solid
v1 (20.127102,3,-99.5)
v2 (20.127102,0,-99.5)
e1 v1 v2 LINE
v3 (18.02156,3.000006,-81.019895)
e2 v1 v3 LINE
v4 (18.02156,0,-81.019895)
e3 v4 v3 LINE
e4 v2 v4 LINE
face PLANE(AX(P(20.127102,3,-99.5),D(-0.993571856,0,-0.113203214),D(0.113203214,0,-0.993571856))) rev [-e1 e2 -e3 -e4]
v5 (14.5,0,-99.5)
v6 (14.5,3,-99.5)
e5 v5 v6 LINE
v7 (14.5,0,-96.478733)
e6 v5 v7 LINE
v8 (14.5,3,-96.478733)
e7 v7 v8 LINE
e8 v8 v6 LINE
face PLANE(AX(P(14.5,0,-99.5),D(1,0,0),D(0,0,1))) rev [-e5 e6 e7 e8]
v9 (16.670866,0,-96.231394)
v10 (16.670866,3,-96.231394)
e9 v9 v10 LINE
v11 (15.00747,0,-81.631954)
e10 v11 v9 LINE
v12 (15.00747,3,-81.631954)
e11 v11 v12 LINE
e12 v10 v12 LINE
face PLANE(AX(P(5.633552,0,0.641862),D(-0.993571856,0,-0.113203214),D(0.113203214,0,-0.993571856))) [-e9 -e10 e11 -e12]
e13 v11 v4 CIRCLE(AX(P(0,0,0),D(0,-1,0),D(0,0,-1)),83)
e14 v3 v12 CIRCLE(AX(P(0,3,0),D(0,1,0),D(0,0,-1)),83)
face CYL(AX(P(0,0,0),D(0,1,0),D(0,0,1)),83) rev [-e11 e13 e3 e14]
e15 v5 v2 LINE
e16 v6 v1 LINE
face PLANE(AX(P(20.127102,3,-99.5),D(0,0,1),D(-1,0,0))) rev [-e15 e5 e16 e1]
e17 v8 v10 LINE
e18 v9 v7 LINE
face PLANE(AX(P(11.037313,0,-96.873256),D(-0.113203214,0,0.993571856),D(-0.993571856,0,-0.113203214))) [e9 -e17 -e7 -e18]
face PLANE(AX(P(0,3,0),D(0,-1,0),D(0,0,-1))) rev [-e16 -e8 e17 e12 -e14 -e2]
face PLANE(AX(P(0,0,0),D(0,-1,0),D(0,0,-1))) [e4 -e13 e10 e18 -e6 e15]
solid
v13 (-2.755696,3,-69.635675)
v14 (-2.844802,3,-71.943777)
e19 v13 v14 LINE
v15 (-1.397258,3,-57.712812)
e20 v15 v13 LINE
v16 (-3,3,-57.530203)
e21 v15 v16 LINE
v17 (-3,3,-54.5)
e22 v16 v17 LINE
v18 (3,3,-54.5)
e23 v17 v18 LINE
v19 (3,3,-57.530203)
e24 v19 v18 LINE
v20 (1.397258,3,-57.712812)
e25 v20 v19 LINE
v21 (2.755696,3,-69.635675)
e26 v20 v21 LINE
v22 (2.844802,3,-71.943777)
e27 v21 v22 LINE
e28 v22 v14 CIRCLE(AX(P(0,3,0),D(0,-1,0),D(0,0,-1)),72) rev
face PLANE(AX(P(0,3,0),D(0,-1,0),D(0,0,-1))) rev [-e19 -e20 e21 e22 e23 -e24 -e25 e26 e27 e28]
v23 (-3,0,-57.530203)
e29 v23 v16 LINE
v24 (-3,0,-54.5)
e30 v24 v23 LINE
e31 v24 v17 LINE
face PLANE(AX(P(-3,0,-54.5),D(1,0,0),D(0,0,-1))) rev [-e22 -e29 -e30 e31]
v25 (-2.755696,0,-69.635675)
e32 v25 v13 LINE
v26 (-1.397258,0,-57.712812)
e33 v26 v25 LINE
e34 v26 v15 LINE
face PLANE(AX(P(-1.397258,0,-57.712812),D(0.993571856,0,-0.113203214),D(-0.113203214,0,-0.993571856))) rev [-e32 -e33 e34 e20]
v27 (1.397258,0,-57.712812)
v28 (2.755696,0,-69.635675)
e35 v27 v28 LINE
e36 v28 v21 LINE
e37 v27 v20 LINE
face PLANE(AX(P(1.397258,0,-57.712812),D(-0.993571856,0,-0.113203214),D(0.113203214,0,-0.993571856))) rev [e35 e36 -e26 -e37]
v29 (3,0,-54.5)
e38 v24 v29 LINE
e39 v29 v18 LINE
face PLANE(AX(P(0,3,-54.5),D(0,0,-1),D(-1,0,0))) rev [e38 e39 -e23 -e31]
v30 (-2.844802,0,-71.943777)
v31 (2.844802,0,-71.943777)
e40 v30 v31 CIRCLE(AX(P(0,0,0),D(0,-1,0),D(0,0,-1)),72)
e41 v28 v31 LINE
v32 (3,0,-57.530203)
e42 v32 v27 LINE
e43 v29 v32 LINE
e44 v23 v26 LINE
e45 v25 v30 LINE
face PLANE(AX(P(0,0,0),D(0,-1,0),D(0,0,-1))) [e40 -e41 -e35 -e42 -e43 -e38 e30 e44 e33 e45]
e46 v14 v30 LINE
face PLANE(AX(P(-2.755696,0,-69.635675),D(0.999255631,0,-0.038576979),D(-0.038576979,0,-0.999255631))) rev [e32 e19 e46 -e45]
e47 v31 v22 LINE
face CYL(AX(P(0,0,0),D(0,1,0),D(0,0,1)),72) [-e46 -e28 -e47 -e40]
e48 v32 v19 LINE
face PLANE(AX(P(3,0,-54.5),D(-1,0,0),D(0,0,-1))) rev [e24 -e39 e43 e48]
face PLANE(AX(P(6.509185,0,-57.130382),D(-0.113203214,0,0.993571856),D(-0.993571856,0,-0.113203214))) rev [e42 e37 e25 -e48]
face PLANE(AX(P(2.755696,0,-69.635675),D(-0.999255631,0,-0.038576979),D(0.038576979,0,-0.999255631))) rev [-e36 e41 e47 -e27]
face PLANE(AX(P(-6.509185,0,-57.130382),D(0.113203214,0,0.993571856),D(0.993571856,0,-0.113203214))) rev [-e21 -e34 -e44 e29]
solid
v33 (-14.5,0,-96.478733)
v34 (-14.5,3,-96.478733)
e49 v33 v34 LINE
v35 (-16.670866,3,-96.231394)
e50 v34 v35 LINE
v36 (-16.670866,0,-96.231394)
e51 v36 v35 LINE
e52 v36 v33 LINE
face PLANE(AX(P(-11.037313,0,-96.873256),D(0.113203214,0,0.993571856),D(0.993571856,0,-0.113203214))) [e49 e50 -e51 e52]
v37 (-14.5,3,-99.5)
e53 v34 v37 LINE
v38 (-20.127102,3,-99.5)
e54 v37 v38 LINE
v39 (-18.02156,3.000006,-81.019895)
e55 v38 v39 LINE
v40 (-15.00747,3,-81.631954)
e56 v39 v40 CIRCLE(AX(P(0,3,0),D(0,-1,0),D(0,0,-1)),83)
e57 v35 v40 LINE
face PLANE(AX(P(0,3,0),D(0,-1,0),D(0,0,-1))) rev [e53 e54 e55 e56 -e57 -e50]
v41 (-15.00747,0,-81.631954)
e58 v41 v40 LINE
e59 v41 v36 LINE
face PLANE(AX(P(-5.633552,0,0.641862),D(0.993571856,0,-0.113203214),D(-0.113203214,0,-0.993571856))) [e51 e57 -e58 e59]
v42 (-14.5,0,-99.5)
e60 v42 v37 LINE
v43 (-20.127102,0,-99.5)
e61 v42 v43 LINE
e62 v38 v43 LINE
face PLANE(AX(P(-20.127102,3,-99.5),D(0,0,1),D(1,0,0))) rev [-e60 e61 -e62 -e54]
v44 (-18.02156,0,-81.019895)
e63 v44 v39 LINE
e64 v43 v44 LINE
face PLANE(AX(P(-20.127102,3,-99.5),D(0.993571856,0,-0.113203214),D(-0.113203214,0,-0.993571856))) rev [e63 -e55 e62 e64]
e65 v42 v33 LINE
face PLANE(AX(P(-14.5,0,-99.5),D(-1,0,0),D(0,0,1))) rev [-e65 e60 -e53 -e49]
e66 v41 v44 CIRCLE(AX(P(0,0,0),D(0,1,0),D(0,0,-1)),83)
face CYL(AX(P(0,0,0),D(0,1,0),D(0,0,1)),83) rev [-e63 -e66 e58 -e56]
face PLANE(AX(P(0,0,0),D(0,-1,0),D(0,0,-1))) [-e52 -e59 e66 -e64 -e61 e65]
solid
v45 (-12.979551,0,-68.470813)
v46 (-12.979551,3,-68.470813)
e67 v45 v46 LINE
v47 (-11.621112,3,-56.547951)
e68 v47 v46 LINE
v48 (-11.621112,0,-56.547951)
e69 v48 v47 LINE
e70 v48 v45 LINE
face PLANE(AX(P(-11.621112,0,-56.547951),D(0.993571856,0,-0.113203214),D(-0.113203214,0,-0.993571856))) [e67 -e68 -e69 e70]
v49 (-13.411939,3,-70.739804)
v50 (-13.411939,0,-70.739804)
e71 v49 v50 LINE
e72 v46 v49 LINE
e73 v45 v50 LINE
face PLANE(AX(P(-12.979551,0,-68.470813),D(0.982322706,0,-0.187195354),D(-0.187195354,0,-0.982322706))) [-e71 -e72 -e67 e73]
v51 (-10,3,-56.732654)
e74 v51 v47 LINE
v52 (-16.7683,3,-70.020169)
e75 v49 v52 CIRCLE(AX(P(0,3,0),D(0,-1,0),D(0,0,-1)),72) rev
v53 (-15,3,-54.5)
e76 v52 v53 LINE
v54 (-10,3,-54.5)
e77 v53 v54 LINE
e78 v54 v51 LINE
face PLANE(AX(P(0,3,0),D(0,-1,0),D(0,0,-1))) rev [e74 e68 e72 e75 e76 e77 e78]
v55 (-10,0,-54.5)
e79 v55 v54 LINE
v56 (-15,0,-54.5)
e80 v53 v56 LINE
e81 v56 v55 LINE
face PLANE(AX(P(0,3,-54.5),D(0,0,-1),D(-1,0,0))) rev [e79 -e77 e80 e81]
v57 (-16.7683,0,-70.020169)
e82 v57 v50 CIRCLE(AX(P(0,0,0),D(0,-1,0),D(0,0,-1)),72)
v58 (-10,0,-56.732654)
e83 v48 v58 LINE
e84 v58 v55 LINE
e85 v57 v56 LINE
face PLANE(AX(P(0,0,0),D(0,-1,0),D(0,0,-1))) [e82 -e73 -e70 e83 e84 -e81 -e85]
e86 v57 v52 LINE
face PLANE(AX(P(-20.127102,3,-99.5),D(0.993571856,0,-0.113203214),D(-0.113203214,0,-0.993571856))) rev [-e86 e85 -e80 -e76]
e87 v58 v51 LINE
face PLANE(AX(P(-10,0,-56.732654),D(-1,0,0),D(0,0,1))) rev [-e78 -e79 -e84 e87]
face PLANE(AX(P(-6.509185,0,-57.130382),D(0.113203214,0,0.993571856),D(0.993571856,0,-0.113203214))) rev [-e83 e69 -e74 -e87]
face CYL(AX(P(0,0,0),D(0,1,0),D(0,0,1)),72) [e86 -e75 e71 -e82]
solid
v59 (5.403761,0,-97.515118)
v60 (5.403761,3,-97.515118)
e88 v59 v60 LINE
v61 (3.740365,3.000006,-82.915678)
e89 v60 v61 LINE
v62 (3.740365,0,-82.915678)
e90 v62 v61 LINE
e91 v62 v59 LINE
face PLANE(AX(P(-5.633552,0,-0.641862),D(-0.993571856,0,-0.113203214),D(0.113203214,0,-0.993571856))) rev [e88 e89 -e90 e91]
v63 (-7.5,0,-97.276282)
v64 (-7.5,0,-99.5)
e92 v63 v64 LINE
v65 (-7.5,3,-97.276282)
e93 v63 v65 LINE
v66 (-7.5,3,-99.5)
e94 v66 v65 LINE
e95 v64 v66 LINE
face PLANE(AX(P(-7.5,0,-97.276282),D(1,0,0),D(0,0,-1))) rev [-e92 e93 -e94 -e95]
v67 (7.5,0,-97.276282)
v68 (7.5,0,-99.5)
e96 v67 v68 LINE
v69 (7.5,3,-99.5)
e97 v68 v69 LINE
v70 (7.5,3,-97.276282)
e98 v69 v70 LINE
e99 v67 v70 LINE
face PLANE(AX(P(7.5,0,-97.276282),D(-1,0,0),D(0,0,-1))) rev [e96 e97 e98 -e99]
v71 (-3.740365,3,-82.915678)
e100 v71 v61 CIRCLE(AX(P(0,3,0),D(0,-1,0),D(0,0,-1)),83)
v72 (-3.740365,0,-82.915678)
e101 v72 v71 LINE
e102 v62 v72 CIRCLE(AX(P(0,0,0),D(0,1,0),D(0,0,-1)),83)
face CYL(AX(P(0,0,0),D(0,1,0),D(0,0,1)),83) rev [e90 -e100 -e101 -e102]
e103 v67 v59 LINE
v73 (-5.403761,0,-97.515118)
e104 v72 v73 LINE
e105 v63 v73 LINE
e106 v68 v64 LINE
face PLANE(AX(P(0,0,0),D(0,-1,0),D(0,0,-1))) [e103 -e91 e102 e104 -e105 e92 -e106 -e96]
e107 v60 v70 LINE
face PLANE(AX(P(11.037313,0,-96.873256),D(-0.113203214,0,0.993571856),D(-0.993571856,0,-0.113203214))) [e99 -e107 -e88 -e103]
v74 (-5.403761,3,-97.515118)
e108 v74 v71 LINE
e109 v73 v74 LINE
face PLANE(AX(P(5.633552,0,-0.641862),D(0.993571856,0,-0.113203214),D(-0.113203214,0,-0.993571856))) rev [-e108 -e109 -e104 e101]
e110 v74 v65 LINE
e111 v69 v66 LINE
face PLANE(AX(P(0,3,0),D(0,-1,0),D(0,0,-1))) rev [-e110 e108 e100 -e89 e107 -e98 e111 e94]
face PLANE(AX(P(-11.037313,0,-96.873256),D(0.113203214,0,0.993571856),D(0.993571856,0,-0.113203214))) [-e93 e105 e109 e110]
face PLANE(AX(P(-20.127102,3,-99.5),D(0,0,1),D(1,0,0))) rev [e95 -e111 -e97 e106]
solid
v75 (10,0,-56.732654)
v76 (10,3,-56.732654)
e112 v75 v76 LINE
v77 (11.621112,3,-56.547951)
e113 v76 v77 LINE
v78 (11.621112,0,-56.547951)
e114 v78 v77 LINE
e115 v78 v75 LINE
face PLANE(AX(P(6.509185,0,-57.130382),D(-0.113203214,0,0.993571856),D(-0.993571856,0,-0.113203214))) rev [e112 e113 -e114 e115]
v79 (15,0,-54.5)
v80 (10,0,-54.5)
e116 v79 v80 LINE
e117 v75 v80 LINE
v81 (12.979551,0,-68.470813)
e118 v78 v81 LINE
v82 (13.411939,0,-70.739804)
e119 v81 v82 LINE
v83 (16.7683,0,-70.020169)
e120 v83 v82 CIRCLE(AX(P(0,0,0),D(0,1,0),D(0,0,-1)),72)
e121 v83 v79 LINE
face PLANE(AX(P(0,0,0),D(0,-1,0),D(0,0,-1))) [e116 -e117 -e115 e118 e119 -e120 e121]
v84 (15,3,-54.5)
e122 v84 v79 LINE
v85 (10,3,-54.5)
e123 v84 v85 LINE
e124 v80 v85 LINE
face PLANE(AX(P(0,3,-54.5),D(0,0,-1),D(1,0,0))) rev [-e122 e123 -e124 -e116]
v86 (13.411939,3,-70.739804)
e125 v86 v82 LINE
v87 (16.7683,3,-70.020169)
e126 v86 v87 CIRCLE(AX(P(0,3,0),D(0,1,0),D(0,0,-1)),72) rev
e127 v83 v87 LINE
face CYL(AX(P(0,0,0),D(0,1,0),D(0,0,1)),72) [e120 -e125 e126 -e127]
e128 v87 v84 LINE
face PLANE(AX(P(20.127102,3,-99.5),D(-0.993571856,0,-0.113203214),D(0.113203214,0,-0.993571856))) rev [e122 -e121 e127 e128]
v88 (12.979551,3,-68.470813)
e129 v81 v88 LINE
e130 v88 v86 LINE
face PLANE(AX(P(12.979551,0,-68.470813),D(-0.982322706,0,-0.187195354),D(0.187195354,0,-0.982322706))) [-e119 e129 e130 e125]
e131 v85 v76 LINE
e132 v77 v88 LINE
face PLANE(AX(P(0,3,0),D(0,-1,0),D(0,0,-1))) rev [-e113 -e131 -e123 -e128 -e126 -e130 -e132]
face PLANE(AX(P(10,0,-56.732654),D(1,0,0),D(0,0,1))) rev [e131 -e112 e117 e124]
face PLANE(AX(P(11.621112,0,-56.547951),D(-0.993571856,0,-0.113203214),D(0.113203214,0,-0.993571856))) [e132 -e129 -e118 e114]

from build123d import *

# Parameters (mm, degrees)
BOSS_EXTRUDE1_DEPTH      = 3
CUT_EXTRUDE1_DEPTH       = 102.55958965
BOSS_EXTRUDE2_DEPTH      = 3
CUT_EXTRUDE7_DEPTH       = 102.55958965
CUT_EXTRUDE9_DEPTH       = 102.55958965
MIRROR10_DEPTH           = 3
CUT_EXTRUDE10_DEPTH      = 102.55958965
CUT_EXTRUDE10_DEPTH_BACK = 102.55958965


# Read off the part's stored shape, not the designer's step: Mirror10
with BuildPart() as part:
    # Sketch1 → Boss-Extrude1 (new body)
    with BuildSketch(Plane(origin=(0, 0, 0), x_dir=(1, 0, 0), z_dir=(0, 1, 0))):
        Polygon((-20.127102374, 99.5), (-15, 54.5), (0, 54.5), (0, 99.5), align=None)
    extrude(amount=BOSS_EXTRUDE1_DEPTH)

    # Sketch2 → Cut-Extrude1 (cut, symmetric)
    with BuildSketch(Plane(origin=(0, 3, 0), x_dir=(1, 0, 0), z_dir=(0, 1, 0))):
        Polygon((-12.142737213, 56.488519479), (-0.87563237, 57.772243923), (-5.403760921, 97.515118151), (-16.670865764, 96.231393706), align=None)
    extrude(amount=CUT_EXTRUDE1_DEPTH, both=True, mode=Mode.SUBTRACT)

    # Sketch6 → Boss-Extrude2 (add)
    with BuildSketch(Plane(origin=(0, 3, 0), x_dir=(1, 0, 0), z_dir=(0, 1, 0))):
        Polygon((-12.142737213, 56.488519479), (-11.621111989, 56.547951167), (-12.979550554, 68.470813435), (-14.293598275, 75.366384737), align=None)
    boss_extrude2 = extrude(amount=-BOSS_EXTRUDE2_DEPTH)

    # Mirror3: Boss-Extrude2 across plane
    add(boss_extrude2.mirror(Plane(origin=(0, 0, 0), x_dir=(0.11320321376790746, 0, 0.9935718556765873), z_dir=(0.9935718556765875, 0, -0.11320321376790746))))

    # Sketch7 → Cut-Extrude7 (cut, symmetric)
    with BuildSketch(Plane(origin=(0, 3, 0), x_dir=(1, 0, 0), z_dir=(0, 1, 0))):
        Polygon((-14.5, 99.5), (-14.5, 96.478732618), (-7.5, 97.276281876), (-7.5, 99.5), align=None)
    extrude(amount=CUT_EXTRUDE7_DEPTH, both=True, mode=Mode.SUBTRACT)

    # Sketch14 → Cut-Extrude9 (cut, symmetric)
    with BuildSketch(Plane(origin=(0, 3, 0), x_dir=(1, 0, 0), z_dir=(0, 1, 0))):
        Polygon((-10, 56.732653547), (-10, 54.5), (-3, 54.5), (-3, 57.530202805), align=None)
    extrude(amount=CUT_EXTRUDE9_DEPTH, both=True, mode=Mode.SUBTRACT)


with BuildPart() as cut_extrude9_piece_1:
    # of the separate pieces the step leaves, piece 1, a body of its own (cut_extrude9_pieces)
    add(part.part.solids().sort_by_distance((-20.127102374, 0, -99.5))[0])


with BuildPart() as cut_extrude9_piece_2:
    # of the separate pieces the step leaves, piece 2, a body of its own (cut_extrude9_pieces)
    add(part.part.solids().sort_by_distance((-3, 0, -54.5))[0])

    # Mirror10 outline → Mirror10 (add)
    with BuildSketch(Plane(origin=(0, 0, 0), x_dir=(1, 0, 0), z_dir=(0, 1, 0))):
        Polygon((0, 54.5), (3, 54.5), (3, 57.530202805), (1.397257594, 57.712812236), (2.755696159, 69.635674504), (3.026493432, 76.650109181), (5.403760921, 97.515118151), (7.5, 97.276281876), (7.5, 99.5), (0, 99.5), align=None)
    extrude(amount=MIRROR10_DEPTH)


with BuildPart() as cut_extrude10_tool:
    # Sketch15 → Cut-Extrude10 (new, two sides: drawn at the far end of the back side and taken through both)
    with BuildSketch(Plane(origin=(0, 3, 0), x_dir=(1, 0, 0), z_dir=(0, 1, 0)).offset(-CUT_EXTRUDE10_DEPTH_BACK)):
        with BuildLine():
            Line((3.740364835, 82.915678077), (3.026493432, 76.650109181))
            Line((3.026493432, 76.650109181), (2.844802122, 71.94377736))
            ThreePointArc((2.844802122, 71.94377736), (-7.02787413, 71.656185952), (-16.768299937, 70.02016936))
            Line((-16.768299937, 70.02016936), (-18.021560353, 81.019894856))
            ThreePointArc((-18.021560353, 81.019894856), (-7.203237804, 82.686839129), (3.740364835, 82.915678077))
        make_face()
    extrude(amount=CUT_EXTRUDE10_DEPTH + CUT_EXTRUDE10_DEPTH_BACK)


with BuildPart() as cut_extrude9_piece_1_1:
    add(cut_extrude9_piece_1.part)

    # Cut-Extrude10: cut by cut_extrude10_tool
    add(cut_extrude10_tool.part, mode=Mode.SUBTRACT)


with BuildPart() as cut_extrude9_piece_2_1:
    add(cut_extrude9_piece_2.part)

    # Cut-Extrude10: cut by cut_extrude10_tool
    add(cut_extrude10_tool.part, mode=Mode.SUBTRACT)


with BuildPart() as cut_extrude10_piece_1:
    # of the separate pieces the step leaves, piece 1, a body of its own (cut_extrude10_pieces)
    add(cut_extrude9_piece_1_1.part.solids().sort_by_distance((-20.127102374, 0, -99.5))[0])


with BuildPart() as cut_extrude10_piece_2:
    # of the separate pieces the step leaves, piece 2, a body of its own (cut_extrude10_pieces)
    add(cut_extrude9_piece_1_1.part.solids().sort_by_distance((-16.768299937, 0, -70.02016936))[0])


with BuildPart() as cut_extrude10_piece_1_of_cut_extrude9_pi:
    # of the separate pieces the step leaves, piece 1, a body of its own (cut_extrude10_pieces_of_cut_extrude9_pie)
    add(cut_extrude9_piece_2_1.part.solids().sort_by_distance((-3.740364835, 0, -82.915678077))[0])


with BuildPart() as cut_extrude10_piece_2_of_cut_extrude9_pi:
    # of the separate pieces the step leaves, piece 2, a body of its own (cut_extrude10_pieces_of_cut_extrude9_pie)
    add(cut_extrude9_piece_2_1.part.solids().sort_by_distance((-3, 0, -54.5))[0])


with BuildPart() as body_5:
    # Mirror13: mirrored copy
    add(cut_extrude10_piece_1.part.mirror(Plane(origin=(0, 0, 0), x_dir=(0, 0, 1), z_dir=(1, 0, 0))))


with BuildPart() as body_6:
    # Mirror13 2: mirrored copy
    add(cut_extrude10_piece_2.part.mirror(Plane(origin=(0, 0, 0), x_dir=(0, 0, 1), z_dir=(1, 0, 0))))


solid = Compound([cut_extrude10_piece_1.part, cut_extrude10_piece_2.part, cut_extrude10_piece_1_of_cut_extrude9_pi.part, cut_extrude10_piece_2_of_cut_extrude9_pi.part, body_5.part, body_6.part])
